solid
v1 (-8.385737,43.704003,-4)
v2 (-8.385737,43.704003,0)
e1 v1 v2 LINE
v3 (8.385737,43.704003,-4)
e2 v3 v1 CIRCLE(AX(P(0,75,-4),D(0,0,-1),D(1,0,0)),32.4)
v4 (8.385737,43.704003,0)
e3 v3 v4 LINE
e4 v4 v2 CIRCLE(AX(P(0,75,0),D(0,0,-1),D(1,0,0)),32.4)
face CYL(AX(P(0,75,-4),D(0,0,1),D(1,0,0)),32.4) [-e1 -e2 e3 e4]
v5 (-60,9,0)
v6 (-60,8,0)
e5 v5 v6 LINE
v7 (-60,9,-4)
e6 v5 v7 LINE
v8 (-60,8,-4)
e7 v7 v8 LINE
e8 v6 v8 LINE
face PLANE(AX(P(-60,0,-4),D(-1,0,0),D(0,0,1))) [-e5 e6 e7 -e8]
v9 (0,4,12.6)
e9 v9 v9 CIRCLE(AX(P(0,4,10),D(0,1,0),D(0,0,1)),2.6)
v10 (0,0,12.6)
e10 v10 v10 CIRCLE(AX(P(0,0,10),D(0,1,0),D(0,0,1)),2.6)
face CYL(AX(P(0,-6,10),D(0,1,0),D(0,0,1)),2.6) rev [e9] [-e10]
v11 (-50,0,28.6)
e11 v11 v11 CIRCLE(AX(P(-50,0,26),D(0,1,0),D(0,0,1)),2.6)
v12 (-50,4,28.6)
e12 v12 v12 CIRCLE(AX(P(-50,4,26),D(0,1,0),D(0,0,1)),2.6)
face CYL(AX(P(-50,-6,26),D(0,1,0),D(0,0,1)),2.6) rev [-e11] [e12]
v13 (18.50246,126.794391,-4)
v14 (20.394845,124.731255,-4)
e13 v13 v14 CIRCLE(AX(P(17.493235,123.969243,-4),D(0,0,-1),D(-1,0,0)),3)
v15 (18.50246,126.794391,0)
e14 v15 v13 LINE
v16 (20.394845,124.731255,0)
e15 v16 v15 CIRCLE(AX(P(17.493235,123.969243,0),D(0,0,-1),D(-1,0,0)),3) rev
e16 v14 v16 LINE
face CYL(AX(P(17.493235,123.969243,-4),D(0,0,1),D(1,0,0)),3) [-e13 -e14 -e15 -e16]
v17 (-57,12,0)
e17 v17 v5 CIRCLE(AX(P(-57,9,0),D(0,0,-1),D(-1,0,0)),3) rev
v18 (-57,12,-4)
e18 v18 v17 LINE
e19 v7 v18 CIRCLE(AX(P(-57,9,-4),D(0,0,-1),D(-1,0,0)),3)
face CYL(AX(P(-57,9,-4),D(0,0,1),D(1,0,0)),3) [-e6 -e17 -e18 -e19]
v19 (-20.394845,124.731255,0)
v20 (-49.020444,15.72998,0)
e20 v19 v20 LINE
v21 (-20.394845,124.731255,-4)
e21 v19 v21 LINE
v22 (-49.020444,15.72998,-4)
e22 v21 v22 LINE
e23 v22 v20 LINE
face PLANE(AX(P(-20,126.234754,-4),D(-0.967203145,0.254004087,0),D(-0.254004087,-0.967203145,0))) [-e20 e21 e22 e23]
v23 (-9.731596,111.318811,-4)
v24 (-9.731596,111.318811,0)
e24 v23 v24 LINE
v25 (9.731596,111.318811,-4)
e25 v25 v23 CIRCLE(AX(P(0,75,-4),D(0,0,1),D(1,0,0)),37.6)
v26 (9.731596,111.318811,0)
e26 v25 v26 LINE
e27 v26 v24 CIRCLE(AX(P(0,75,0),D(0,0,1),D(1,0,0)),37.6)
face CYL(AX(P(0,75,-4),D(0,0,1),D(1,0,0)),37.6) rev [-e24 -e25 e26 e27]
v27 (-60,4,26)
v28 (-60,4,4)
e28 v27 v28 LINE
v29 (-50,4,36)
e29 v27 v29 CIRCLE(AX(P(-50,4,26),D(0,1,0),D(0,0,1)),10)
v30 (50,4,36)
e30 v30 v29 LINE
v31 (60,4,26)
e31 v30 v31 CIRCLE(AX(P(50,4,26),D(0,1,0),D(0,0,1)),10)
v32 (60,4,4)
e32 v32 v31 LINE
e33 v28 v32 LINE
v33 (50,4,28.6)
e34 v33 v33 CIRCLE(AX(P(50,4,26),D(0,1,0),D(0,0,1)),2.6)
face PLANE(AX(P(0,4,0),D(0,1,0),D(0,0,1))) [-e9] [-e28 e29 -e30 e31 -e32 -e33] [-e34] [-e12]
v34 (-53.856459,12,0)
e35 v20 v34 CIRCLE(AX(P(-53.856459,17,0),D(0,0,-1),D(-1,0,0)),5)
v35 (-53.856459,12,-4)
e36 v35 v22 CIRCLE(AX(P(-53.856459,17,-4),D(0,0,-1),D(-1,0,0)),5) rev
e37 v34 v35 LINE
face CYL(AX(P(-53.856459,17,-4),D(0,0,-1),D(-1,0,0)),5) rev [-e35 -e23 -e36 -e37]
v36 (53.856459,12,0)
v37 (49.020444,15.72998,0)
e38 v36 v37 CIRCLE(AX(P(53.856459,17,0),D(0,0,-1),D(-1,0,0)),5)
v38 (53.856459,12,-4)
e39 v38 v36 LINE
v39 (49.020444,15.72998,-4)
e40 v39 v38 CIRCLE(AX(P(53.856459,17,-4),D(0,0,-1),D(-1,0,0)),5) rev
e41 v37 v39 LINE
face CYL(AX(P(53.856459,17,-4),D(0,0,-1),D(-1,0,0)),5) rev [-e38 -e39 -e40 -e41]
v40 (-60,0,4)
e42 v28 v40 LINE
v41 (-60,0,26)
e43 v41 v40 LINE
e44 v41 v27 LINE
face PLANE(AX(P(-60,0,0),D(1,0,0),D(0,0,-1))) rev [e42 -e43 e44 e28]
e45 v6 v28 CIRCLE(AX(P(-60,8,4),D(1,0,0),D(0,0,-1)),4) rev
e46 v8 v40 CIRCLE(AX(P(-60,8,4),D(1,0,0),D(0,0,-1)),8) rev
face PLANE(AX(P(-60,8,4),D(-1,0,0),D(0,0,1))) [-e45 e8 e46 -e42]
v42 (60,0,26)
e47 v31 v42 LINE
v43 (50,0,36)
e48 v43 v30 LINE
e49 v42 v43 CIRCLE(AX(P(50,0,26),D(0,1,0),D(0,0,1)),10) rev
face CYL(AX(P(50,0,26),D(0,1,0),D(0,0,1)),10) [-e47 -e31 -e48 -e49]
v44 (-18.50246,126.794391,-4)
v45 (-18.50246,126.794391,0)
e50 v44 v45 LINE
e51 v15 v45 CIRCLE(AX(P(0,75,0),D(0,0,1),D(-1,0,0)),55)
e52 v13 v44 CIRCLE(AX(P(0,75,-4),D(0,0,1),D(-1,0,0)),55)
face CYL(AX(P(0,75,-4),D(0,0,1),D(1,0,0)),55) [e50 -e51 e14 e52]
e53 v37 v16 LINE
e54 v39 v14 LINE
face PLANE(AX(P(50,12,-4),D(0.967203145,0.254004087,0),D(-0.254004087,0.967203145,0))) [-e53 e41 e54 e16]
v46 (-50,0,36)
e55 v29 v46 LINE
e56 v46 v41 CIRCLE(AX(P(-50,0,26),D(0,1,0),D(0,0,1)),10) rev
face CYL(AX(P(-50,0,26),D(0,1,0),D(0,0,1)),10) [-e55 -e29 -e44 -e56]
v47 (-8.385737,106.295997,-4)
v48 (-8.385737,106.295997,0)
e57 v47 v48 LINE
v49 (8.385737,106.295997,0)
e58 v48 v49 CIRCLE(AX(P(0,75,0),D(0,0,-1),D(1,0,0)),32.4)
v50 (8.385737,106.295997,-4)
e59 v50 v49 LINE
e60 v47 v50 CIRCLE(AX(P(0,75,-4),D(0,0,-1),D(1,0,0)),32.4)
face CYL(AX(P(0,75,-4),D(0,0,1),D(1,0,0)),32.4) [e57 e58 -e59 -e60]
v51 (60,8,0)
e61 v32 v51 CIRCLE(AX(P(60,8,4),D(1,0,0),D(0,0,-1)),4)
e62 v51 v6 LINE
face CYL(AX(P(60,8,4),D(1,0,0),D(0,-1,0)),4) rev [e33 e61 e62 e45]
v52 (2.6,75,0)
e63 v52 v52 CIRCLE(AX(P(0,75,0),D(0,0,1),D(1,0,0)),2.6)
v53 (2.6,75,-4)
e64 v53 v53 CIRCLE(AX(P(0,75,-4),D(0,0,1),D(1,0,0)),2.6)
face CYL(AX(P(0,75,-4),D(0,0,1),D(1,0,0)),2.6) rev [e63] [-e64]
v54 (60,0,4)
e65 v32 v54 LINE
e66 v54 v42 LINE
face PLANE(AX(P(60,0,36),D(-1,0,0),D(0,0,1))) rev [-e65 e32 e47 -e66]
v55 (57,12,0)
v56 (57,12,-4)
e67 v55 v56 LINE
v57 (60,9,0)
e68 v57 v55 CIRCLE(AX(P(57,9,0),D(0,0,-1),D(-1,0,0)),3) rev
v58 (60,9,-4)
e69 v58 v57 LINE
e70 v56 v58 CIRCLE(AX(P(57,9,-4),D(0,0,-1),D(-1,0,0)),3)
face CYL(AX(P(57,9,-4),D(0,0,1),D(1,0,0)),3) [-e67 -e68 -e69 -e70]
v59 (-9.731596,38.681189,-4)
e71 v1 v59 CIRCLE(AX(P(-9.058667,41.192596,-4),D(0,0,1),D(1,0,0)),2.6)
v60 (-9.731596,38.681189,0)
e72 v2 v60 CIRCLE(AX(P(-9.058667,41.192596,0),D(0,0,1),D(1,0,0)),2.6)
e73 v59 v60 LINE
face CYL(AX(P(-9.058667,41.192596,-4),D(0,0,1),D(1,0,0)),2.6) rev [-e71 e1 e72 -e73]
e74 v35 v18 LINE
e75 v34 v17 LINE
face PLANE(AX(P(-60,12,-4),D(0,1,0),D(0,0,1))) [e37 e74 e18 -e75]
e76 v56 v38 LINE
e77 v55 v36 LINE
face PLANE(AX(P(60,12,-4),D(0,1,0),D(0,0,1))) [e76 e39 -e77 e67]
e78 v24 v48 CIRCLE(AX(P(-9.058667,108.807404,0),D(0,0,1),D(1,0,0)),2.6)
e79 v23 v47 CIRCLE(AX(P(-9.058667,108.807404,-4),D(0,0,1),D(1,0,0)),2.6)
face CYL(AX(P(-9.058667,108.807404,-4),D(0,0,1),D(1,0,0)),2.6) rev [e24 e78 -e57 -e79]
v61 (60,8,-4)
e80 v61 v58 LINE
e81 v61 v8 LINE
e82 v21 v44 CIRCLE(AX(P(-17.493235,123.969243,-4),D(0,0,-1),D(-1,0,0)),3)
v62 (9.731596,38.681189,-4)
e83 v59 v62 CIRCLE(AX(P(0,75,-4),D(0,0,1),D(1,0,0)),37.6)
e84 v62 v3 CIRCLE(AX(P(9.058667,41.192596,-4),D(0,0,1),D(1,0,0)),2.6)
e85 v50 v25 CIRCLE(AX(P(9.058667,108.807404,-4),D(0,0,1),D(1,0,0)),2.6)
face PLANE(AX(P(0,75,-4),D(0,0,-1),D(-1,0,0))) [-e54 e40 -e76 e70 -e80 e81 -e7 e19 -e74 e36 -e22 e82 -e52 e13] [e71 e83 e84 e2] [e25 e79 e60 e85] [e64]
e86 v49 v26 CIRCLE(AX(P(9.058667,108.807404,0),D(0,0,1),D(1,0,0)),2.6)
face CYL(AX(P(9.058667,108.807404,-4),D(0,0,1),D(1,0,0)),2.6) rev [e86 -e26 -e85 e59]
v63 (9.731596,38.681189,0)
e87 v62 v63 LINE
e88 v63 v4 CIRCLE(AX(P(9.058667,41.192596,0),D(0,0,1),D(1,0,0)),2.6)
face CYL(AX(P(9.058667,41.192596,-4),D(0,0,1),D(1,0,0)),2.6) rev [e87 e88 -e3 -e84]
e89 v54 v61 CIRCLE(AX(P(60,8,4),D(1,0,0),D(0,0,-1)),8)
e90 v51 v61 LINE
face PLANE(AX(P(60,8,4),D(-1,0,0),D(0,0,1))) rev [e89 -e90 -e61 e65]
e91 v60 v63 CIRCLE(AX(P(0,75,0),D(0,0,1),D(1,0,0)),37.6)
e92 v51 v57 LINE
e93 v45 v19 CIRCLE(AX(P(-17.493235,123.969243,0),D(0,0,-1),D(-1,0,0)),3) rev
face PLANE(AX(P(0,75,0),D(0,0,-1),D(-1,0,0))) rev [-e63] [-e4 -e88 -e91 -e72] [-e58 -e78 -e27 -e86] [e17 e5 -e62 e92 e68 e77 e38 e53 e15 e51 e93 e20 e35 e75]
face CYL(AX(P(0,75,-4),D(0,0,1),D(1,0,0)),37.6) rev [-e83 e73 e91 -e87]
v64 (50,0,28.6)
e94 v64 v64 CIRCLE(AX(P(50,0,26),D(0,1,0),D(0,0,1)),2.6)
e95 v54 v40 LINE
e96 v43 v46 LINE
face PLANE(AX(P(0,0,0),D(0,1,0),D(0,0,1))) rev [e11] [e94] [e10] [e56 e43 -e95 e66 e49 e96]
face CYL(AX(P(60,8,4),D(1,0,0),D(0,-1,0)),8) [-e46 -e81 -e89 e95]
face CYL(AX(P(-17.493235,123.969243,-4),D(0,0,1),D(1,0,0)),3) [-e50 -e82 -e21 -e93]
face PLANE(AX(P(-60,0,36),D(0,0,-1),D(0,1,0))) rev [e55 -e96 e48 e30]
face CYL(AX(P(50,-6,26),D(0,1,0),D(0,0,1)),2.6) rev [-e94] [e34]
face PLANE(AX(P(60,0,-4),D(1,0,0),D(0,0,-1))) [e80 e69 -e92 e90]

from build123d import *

# Parameters (mm, degrees)
SKETCH_13_R                      = 2.6
SM_BASE_FLANGE_2_DEPTH           = 4
SM_EDGE_FLANGE_2_STRIP_W         = 24
SM_EDGE_FLANGE_2_STRIP_H         = 4
SM_EDGE_FLANGE_2_STRIP_CUT_DEPTH = 120
SM_EDGE_FLANGE_2_DEPTH           = 120
FILLET_1_R                       = 5
FILLET_2_R                       = 3
FILLET_3_R                       = 10
SKETCH_23_R                      = 2.6
CUT_EXTRUDE_2_DEPTH              = 10


# Sheet-metal steps are written as plain solids
with BuildPart() as part:
    # Эскиз13 → Базовая кромка2 (new body)
    with BuildSketch(Plane.XY):
        with BuildLine():
            Line((-60, 0), (60, 0))
            Line((60, 0), (60, 12))
            Line((60, 12), (50, 12))
            Line((50, 12), (20, 126.23475383))
            ThreePointArc((20, 126.23475383), (0, 130), (-20, 126.23475383))
            Line((-20, 126.23475383), (-50, 12))
            Line((-50, 12), (-60, 12))
            Line((-60, 12), (-60, 0))
        make_face()
        with Locations((0, 75)):
            Circle(SKETCH_13_R, mode=Mode.SUBTRACT)
        with BuildLine():
            ThreePointArc((9.731596096, 111.318811068), (0, 112.6), (-9.731596096, 111.318811068))
            ThreePointArc((-9.731596096, 111.318811068), (-11.570073727, 108.134474403), (-8.385737061, 106.295996772))
            ThreePointArc((-8.385737061, 106.295996772), (0, 107.4), (8.385737061, 106.295996772))
            ThreePointArc((8.385737061, 106.295996772), (11.570073727, 108.134474403), (9.731596096, 111.318811068))
        make_face(mode=Mode.SUBTRACT)
        with BuildLine():
            ThreePointArc((-9.731596096, 38.681188932), (0, 37.4), (9.731596096, 38.681188932))
            ThreePointArc((9.731596096, 38.681188932), (11.570073727, 41.865525597), (8.385737061, 43.704003228))
            ThreePointArc((8.385737061, 43.704003228), (0, 42.6), (-8.385737061, 43.704003228))
            ThreePointArc((-8.385737061, 43.704003228), (-11.570073727, 41.865525597), (-9.731596096, 38.681188932))
        make_face(mode=Mode.SUBTRACT)
    extrude(amount=-SM_BASE_FLANGE_2_DEPTH)

    # Ребро-кромка2 strip (across the edge) → Ребро-кромка2 strip cut (cut)
    with BuildSketch(Plane.YZ.offset(-60)):
        with Locations((-4, -2)):
            Rectangle(SM_EDGE_FLANGE_2_STRIP_W, SM_EDGE_FLANGE_2_STRIP_H)
    extrude(amount=SM_EDGE_FLANGE_2_STRIP_CUT_DEPTH, mode=Mode.SUBTRACT)

    # Ребро-кромка2 section (across the edge) → Ребро-кромка2 (add)
    with BuildSketch(Plane.YZ.offset(-60)):
        with BuildLine():
            Line((0, 4), (0, 36))
            Line((0, 36), (4, 36))
            Line((4, 36), (4, 4))
            ThreePointArc((4, 4), (5.171572875, 1.171572875), (8, 0))
            Line((8, 0), (8, -4))
            ThreePointArc((8, -4), (2.343145751, -1.656854249), (0, 4))
        make_face()
    extrude(amount=SM_EDGE_FLANGE_2_DEPTH)

    # Скругление1
    fillet_1_edges = [part.edges().sort_by_distance(p)[0] for p in [
        (-50, 12, -2),
        (50, 12, -2),
    ]]
    fillet(fillet_1_edges, radius=FILLET_1_R)

    # Скругление2
    fillet_2_edges = [part.edges().sort_by_distance(p)[0] for p in [
        (-60, 12, -2),
        (-20, 126.23475383, -2),
        (20, 126.23475383, -2),
        (60, 12, -2),
    ]]
    fillet(fillet_2_edges, radius=FILLET_2_R)

    # Скругление3
    fillet_3_edges = [part.edges().sort_by_distance(p)[0] for p in [
        (-60, 2, 36),
        (60, 2, 36),
    ]]
    fillet(fillet_3_edges, radius=FILLET_3_R)

    # Эскиз23 → Вырез-Вытянуть2 (cut)
    with BuildSketch(Plane(origin=(0, 4, 0), x_dir=(1, 0, 0), z_dir=(0, 1, 0))):
        with Locations(Location((-50, -26, 0), (0, 0, 270))):
            Circle(SKETCH_23_R)
        with Locations(Location((50, -26, 0), (0, 0, 270))):
            Circle(SKETCH_23_R)
        with Locations(Location((0, -10, 0), (0, 0, 270))):
            Circle(SKETCH_23_R)
    extrude(amount=-CUT_EXTRUDE_2_DEPTH, mode=Mode.SUBTRACT)


solid = part.part
